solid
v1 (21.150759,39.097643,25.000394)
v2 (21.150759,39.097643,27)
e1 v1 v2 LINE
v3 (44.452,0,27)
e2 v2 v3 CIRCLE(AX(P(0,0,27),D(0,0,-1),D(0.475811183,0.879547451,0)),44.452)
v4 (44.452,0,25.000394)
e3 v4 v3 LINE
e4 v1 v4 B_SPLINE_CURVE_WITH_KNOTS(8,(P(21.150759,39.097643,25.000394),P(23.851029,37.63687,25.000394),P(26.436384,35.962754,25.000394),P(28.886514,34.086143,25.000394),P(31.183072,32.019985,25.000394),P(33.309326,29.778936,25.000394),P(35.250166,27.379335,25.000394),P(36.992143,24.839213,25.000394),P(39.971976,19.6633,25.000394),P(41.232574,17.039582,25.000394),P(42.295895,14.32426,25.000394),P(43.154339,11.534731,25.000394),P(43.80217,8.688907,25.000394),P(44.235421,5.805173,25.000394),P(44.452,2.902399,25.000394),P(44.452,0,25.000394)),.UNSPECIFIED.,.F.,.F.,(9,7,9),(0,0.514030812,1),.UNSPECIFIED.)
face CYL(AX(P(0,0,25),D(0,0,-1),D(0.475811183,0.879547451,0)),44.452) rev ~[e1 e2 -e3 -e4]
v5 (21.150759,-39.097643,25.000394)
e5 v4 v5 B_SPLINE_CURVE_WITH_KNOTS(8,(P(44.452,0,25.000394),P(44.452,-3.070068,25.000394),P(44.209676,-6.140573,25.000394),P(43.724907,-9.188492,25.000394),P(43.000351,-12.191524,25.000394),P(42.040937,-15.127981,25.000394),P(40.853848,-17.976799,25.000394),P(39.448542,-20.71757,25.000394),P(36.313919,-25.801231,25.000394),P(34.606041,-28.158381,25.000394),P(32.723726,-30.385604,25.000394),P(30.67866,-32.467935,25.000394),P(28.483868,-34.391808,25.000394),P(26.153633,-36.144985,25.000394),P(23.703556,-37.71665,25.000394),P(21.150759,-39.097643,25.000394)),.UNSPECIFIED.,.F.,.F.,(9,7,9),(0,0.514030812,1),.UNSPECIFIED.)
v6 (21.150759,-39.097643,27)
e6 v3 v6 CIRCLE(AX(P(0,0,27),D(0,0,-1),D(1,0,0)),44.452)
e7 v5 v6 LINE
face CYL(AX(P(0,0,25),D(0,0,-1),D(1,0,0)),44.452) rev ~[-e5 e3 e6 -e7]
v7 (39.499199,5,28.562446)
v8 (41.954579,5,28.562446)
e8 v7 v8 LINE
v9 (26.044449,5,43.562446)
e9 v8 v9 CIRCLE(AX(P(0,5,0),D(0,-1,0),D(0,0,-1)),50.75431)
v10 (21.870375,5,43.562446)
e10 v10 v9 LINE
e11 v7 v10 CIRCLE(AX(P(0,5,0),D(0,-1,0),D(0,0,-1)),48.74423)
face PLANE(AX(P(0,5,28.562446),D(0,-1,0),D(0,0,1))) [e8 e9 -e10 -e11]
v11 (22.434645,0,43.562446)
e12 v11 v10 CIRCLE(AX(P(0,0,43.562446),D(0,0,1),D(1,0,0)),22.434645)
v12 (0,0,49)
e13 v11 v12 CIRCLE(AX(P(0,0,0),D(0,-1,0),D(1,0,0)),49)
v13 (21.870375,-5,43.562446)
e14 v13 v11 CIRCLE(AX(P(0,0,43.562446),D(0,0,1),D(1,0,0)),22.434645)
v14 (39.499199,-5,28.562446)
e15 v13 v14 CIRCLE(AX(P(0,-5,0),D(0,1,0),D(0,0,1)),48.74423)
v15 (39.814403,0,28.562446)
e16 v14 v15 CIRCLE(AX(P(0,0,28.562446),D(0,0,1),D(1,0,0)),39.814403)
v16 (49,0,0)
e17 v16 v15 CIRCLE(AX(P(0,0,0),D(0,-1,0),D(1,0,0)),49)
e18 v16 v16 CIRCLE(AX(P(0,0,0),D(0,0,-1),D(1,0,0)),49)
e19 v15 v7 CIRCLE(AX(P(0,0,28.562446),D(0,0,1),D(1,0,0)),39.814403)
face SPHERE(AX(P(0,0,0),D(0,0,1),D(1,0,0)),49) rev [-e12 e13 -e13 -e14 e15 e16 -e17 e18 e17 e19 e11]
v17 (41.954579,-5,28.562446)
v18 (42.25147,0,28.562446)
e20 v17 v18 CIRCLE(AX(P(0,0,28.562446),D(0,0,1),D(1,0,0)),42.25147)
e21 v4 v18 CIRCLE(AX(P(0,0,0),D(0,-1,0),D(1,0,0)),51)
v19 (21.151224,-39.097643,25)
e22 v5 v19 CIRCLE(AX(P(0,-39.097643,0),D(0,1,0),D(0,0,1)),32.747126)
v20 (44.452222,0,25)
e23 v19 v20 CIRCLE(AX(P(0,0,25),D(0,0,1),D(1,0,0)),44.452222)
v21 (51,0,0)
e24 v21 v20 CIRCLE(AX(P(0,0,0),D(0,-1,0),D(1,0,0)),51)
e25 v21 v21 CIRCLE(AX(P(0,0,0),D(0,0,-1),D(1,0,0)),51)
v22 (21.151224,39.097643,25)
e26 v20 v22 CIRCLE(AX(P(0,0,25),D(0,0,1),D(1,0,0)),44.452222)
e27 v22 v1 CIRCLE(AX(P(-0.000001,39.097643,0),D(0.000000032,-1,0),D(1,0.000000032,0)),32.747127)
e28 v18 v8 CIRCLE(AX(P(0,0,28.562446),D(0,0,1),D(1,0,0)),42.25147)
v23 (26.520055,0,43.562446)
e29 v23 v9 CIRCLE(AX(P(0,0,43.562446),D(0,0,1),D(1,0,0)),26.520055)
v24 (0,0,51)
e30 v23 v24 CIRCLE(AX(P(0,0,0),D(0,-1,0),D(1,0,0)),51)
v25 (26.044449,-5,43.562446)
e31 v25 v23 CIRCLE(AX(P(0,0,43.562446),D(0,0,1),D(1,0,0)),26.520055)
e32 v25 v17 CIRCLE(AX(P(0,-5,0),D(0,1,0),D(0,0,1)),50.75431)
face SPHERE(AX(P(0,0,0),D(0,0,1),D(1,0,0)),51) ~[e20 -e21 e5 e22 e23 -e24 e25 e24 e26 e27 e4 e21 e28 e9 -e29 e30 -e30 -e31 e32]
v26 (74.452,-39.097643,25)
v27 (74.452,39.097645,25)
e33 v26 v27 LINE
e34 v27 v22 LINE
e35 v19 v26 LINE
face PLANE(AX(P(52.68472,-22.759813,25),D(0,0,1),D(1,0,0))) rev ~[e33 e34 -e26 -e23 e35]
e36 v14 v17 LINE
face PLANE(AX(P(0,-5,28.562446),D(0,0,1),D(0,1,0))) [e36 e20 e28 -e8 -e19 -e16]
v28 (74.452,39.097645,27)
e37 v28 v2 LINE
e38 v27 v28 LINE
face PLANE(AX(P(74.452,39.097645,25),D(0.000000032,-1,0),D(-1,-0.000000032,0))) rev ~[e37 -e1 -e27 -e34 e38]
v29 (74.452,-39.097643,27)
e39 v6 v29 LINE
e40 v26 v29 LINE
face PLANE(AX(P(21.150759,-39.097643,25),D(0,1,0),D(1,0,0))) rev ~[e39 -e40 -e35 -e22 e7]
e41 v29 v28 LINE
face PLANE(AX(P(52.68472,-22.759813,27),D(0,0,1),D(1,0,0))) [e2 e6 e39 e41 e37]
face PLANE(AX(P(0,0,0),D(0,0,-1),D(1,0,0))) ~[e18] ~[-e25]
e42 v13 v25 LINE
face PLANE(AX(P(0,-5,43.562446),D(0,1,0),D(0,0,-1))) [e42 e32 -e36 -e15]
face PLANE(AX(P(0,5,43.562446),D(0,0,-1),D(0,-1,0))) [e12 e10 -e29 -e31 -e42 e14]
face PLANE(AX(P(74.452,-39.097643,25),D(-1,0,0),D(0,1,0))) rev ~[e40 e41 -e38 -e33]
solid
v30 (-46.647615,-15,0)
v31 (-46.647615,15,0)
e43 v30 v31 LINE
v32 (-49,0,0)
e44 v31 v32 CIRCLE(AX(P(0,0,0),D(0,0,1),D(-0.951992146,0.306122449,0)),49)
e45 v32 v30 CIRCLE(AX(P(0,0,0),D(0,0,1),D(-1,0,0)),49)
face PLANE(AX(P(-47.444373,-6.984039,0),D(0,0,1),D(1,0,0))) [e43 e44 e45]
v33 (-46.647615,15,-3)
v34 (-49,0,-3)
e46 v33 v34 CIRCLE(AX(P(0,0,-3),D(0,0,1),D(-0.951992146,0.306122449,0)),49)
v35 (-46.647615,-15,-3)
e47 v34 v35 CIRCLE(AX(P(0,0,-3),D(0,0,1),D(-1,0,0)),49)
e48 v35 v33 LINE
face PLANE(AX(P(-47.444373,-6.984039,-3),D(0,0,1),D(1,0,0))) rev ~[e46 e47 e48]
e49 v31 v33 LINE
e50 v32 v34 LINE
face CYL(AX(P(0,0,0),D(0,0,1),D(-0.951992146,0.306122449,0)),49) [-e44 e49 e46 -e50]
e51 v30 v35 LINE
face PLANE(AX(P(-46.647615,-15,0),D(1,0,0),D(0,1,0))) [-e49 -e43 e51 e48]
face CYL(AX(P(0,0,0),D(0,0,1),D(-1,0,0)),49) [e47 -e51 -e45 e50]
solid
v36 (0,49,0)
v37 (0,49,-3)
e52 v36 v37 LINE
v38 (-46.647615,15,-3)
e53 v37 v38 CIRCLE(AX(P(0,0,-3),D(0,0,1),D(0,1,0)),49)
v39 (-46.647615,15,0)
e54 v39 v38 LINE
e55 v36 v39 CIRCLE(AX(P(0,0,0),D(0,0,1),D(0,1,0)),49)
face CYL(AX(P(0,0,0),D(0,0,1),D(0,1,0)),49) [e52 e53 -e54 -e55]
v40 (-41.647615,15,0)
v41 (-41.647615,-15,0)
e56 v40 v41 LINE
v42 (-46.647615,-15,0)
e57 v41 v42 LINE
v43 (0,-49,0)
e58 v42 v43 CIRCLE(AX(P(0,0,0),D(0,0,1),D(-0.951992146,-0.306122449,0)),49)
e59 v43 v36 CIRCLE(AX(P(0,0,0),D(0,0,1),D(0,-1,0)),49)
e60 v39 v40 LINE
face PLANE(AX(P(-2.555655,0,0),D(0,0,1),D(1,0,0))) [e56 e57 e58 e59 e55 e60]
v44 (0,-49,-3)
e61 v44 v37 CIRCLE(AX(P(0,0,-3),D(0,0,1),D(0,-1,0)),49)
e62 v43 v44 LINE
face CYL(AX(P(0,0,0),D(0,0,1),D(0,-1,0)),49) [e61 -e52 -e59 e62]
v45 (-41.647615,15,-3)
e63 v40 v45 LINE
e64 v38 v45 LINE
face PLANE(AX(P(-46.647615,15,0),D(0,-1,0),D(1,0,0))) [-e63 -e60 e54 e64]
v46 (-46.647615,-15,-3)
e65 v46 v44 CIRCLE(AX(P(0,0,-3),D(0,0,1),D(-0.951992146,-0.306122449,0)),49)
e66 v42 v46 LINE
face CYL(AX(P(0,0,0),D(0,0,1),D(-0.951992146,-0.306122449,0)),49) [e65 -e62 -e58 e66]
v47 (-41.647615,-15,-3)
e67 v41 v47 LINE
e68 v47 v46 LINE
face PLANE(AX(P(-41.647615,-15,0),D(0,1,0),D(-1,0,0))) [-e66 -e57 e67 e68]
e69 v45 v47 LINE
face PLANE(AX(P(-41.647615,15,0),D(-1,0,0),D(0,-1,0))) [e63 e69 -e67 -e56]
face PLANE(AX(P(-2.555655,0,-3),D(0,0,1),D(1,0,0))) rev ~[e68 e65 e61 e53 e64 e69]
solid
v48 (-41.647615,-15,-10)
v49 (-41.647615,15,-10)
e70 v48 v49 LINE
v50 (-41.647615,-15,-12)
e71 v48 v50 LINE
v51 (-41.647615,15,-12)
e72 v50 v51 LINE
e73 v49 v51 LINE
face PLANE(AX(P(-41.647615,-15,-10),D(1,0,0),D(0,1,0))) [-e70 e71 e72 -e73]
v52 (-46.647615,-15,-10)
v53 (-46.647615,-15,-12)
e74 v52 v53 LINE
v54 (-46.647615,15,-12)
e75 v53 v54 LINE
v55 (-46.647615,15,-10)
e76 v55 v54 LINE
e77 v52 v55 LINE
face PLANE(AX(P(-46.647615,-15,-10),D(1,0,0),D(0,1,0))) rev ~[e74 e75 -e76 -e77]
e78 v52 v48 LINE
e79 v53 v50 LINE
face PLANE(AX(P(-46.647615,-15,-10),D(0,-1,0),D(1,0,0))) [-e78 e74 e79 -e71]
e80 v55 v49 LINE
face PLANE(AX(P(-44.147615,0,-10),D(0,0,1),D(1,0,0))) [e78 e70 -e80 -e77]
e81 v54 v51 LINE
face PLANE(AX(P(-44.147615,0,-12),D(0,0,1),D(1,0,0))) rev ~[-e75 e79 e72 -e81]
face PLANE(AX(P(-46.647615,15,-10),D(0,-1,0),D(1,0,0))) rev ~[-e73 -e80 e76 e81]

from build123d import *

# Parameters (mm, degrees)
F7_DEPTH  = 2
F10_DEPTH = 64.1
F12_DEPTH = 3
F15_W     = 5
F15_H     = 30
F16_DEPTH = 2


# Not quite as in the source:
# - the program builds the solid bodies; features that only make, move or delete a surface that nothing else refers to are left out


with BuildPart() as f1:
    # F0 (on Front) → F1 (revolve)
    with BuildSketch(Plane.XZ):
        with BuildLine():
            Line((0, 0), (51, 0))
            ThreePointArc((51, 0), (36.0624458405, 36.0624458405), (0, 51))
            Line((0, 51), (0, 0))
        make_face()
    revolve(axis=Axis((0, 0, 25.5), (0, 0, -1)))

    # F2 (on Front) → F3 (revolve, cut)
    with BuildSketch(Plane.XZ):
        with BuildLine():
            Line((0, 0), (49, 0))
            ThreePointArc((49, 0), (34.6482322781, 34.6482322781), (0, 49))
            Line((0, 49), (0, 0))
        make_face()
    revolve(axis=Axis((0, 0, 24.5), (0, 0, -1)), mode=Mode.SUBTRACT)

    # F6 (on offset) → F7 (join)
    with BuildSketch(Plane.XY.offset(25)):
        with BuildLine():
            ThreePointArc((44.452, 0), (38.1849042827, -22.757271122), (21.1507587097, -39.0976432794))
            Line((21.1507587097, -39.0976432794), (74.452, -39.0976432794))
            Line((74.452, -39.0976432794), (74.452, 0))
            Line((74.452, 0), (44.452, 0))
        make_face()
        with BuildLine():
            ThreePointArc((21.1507587097, 39.0976432794), (38.1849042827, 22.757271122), (44.452, 0))
            Line((44.452, 0), (74.452, 0))
            Line((74.452, 0), (74.452, 39.097645))
            Line((74.452, 39.097645), (21.1507587097, 39.0976432794))
        make_face()
    extrude(amount=F7_DEPTH)

    # F9 (on Right) → F10 (cut)
    with BuildSketch(Plane.YZ):
        Polygon((5, 36.0624458633), (0, 36.0624458633), (-5, 36.0624458633), (-5, 28.5624458633), (5, 28.5624458633), align=None)
        Polygon((-5, 36.0624458633), (0, 36.0624458633), (5, 36.0624458633), (5, 43.5624458633), (0, 43.5624458633), (-5, 43.5624458633), align=None)
    extrude(amount=F10_DEPTH, mode=Mode.SUBTRACT)


with BuildPart() as f12:
    # F11 (on Top) → F12 (new body)
    with BuildSketch(Plane.XY):
        with BuildLine():
            Line((-41.6476151588, 15), (-41.6476151588, 0))
            Line((-41.6476151588, 0), (-41.6476151588, -15))
            Line((-41.6476151588, -15), (-46.6476151588, -15))
            ThreePointArc((-46.6476151588, -15), (-28.8617393793, -39.5979797464), (0, -49))
            ThreePointArc((0, -49), (49, 0), (0, 49))
            ThreePointArc((0, 49), (-28.8617393793, 39.5979797464), (-46.6476151588, 15))
            Line((-46.6476151588, 15), (-41.6476151588, 15))
        make_face()
    extrude(amount=-F12_DEPTH)


with BuildPart() as f12b:
    # F11 (on Top) → F12, piece 2 (new body)
    with BuildSketch(Plane.XY):
        with BuildLine():
            Line((-46.6476151588, -15), (-46.6476151588, 0))
            Line((-46.6476151588, 0), (-49, 0))
            ThreePointArc((-49, 0), (-48.408331632, -7.591668368), (-46.6476151588, -15))
        make_face()
        with BuildLine():
            Line((-49, 0), (-46.6476151588, 0))
            Line((-46.6476151588, 0), (-46.6476151588, 15))
            ThreePointArc((-46.6476151588, 15), (-48.408331632, 7.591668368), (-49, 0))
        make_face()
    extrude(amount=-F12_DEPTH)


with BuildPart() as f16:
    # F15 (on offset) → F16 (new body)
    with BuildSketch(Plane.XY.offset(-10)):
        with Locations((-44.1476151588, 0)):
            Rectangle(F15_W, F15_H)
    extrude(amount=-F16_DEPTH)


solid = Compound([f1.part, f12.part, f12b.part, f16.part])
